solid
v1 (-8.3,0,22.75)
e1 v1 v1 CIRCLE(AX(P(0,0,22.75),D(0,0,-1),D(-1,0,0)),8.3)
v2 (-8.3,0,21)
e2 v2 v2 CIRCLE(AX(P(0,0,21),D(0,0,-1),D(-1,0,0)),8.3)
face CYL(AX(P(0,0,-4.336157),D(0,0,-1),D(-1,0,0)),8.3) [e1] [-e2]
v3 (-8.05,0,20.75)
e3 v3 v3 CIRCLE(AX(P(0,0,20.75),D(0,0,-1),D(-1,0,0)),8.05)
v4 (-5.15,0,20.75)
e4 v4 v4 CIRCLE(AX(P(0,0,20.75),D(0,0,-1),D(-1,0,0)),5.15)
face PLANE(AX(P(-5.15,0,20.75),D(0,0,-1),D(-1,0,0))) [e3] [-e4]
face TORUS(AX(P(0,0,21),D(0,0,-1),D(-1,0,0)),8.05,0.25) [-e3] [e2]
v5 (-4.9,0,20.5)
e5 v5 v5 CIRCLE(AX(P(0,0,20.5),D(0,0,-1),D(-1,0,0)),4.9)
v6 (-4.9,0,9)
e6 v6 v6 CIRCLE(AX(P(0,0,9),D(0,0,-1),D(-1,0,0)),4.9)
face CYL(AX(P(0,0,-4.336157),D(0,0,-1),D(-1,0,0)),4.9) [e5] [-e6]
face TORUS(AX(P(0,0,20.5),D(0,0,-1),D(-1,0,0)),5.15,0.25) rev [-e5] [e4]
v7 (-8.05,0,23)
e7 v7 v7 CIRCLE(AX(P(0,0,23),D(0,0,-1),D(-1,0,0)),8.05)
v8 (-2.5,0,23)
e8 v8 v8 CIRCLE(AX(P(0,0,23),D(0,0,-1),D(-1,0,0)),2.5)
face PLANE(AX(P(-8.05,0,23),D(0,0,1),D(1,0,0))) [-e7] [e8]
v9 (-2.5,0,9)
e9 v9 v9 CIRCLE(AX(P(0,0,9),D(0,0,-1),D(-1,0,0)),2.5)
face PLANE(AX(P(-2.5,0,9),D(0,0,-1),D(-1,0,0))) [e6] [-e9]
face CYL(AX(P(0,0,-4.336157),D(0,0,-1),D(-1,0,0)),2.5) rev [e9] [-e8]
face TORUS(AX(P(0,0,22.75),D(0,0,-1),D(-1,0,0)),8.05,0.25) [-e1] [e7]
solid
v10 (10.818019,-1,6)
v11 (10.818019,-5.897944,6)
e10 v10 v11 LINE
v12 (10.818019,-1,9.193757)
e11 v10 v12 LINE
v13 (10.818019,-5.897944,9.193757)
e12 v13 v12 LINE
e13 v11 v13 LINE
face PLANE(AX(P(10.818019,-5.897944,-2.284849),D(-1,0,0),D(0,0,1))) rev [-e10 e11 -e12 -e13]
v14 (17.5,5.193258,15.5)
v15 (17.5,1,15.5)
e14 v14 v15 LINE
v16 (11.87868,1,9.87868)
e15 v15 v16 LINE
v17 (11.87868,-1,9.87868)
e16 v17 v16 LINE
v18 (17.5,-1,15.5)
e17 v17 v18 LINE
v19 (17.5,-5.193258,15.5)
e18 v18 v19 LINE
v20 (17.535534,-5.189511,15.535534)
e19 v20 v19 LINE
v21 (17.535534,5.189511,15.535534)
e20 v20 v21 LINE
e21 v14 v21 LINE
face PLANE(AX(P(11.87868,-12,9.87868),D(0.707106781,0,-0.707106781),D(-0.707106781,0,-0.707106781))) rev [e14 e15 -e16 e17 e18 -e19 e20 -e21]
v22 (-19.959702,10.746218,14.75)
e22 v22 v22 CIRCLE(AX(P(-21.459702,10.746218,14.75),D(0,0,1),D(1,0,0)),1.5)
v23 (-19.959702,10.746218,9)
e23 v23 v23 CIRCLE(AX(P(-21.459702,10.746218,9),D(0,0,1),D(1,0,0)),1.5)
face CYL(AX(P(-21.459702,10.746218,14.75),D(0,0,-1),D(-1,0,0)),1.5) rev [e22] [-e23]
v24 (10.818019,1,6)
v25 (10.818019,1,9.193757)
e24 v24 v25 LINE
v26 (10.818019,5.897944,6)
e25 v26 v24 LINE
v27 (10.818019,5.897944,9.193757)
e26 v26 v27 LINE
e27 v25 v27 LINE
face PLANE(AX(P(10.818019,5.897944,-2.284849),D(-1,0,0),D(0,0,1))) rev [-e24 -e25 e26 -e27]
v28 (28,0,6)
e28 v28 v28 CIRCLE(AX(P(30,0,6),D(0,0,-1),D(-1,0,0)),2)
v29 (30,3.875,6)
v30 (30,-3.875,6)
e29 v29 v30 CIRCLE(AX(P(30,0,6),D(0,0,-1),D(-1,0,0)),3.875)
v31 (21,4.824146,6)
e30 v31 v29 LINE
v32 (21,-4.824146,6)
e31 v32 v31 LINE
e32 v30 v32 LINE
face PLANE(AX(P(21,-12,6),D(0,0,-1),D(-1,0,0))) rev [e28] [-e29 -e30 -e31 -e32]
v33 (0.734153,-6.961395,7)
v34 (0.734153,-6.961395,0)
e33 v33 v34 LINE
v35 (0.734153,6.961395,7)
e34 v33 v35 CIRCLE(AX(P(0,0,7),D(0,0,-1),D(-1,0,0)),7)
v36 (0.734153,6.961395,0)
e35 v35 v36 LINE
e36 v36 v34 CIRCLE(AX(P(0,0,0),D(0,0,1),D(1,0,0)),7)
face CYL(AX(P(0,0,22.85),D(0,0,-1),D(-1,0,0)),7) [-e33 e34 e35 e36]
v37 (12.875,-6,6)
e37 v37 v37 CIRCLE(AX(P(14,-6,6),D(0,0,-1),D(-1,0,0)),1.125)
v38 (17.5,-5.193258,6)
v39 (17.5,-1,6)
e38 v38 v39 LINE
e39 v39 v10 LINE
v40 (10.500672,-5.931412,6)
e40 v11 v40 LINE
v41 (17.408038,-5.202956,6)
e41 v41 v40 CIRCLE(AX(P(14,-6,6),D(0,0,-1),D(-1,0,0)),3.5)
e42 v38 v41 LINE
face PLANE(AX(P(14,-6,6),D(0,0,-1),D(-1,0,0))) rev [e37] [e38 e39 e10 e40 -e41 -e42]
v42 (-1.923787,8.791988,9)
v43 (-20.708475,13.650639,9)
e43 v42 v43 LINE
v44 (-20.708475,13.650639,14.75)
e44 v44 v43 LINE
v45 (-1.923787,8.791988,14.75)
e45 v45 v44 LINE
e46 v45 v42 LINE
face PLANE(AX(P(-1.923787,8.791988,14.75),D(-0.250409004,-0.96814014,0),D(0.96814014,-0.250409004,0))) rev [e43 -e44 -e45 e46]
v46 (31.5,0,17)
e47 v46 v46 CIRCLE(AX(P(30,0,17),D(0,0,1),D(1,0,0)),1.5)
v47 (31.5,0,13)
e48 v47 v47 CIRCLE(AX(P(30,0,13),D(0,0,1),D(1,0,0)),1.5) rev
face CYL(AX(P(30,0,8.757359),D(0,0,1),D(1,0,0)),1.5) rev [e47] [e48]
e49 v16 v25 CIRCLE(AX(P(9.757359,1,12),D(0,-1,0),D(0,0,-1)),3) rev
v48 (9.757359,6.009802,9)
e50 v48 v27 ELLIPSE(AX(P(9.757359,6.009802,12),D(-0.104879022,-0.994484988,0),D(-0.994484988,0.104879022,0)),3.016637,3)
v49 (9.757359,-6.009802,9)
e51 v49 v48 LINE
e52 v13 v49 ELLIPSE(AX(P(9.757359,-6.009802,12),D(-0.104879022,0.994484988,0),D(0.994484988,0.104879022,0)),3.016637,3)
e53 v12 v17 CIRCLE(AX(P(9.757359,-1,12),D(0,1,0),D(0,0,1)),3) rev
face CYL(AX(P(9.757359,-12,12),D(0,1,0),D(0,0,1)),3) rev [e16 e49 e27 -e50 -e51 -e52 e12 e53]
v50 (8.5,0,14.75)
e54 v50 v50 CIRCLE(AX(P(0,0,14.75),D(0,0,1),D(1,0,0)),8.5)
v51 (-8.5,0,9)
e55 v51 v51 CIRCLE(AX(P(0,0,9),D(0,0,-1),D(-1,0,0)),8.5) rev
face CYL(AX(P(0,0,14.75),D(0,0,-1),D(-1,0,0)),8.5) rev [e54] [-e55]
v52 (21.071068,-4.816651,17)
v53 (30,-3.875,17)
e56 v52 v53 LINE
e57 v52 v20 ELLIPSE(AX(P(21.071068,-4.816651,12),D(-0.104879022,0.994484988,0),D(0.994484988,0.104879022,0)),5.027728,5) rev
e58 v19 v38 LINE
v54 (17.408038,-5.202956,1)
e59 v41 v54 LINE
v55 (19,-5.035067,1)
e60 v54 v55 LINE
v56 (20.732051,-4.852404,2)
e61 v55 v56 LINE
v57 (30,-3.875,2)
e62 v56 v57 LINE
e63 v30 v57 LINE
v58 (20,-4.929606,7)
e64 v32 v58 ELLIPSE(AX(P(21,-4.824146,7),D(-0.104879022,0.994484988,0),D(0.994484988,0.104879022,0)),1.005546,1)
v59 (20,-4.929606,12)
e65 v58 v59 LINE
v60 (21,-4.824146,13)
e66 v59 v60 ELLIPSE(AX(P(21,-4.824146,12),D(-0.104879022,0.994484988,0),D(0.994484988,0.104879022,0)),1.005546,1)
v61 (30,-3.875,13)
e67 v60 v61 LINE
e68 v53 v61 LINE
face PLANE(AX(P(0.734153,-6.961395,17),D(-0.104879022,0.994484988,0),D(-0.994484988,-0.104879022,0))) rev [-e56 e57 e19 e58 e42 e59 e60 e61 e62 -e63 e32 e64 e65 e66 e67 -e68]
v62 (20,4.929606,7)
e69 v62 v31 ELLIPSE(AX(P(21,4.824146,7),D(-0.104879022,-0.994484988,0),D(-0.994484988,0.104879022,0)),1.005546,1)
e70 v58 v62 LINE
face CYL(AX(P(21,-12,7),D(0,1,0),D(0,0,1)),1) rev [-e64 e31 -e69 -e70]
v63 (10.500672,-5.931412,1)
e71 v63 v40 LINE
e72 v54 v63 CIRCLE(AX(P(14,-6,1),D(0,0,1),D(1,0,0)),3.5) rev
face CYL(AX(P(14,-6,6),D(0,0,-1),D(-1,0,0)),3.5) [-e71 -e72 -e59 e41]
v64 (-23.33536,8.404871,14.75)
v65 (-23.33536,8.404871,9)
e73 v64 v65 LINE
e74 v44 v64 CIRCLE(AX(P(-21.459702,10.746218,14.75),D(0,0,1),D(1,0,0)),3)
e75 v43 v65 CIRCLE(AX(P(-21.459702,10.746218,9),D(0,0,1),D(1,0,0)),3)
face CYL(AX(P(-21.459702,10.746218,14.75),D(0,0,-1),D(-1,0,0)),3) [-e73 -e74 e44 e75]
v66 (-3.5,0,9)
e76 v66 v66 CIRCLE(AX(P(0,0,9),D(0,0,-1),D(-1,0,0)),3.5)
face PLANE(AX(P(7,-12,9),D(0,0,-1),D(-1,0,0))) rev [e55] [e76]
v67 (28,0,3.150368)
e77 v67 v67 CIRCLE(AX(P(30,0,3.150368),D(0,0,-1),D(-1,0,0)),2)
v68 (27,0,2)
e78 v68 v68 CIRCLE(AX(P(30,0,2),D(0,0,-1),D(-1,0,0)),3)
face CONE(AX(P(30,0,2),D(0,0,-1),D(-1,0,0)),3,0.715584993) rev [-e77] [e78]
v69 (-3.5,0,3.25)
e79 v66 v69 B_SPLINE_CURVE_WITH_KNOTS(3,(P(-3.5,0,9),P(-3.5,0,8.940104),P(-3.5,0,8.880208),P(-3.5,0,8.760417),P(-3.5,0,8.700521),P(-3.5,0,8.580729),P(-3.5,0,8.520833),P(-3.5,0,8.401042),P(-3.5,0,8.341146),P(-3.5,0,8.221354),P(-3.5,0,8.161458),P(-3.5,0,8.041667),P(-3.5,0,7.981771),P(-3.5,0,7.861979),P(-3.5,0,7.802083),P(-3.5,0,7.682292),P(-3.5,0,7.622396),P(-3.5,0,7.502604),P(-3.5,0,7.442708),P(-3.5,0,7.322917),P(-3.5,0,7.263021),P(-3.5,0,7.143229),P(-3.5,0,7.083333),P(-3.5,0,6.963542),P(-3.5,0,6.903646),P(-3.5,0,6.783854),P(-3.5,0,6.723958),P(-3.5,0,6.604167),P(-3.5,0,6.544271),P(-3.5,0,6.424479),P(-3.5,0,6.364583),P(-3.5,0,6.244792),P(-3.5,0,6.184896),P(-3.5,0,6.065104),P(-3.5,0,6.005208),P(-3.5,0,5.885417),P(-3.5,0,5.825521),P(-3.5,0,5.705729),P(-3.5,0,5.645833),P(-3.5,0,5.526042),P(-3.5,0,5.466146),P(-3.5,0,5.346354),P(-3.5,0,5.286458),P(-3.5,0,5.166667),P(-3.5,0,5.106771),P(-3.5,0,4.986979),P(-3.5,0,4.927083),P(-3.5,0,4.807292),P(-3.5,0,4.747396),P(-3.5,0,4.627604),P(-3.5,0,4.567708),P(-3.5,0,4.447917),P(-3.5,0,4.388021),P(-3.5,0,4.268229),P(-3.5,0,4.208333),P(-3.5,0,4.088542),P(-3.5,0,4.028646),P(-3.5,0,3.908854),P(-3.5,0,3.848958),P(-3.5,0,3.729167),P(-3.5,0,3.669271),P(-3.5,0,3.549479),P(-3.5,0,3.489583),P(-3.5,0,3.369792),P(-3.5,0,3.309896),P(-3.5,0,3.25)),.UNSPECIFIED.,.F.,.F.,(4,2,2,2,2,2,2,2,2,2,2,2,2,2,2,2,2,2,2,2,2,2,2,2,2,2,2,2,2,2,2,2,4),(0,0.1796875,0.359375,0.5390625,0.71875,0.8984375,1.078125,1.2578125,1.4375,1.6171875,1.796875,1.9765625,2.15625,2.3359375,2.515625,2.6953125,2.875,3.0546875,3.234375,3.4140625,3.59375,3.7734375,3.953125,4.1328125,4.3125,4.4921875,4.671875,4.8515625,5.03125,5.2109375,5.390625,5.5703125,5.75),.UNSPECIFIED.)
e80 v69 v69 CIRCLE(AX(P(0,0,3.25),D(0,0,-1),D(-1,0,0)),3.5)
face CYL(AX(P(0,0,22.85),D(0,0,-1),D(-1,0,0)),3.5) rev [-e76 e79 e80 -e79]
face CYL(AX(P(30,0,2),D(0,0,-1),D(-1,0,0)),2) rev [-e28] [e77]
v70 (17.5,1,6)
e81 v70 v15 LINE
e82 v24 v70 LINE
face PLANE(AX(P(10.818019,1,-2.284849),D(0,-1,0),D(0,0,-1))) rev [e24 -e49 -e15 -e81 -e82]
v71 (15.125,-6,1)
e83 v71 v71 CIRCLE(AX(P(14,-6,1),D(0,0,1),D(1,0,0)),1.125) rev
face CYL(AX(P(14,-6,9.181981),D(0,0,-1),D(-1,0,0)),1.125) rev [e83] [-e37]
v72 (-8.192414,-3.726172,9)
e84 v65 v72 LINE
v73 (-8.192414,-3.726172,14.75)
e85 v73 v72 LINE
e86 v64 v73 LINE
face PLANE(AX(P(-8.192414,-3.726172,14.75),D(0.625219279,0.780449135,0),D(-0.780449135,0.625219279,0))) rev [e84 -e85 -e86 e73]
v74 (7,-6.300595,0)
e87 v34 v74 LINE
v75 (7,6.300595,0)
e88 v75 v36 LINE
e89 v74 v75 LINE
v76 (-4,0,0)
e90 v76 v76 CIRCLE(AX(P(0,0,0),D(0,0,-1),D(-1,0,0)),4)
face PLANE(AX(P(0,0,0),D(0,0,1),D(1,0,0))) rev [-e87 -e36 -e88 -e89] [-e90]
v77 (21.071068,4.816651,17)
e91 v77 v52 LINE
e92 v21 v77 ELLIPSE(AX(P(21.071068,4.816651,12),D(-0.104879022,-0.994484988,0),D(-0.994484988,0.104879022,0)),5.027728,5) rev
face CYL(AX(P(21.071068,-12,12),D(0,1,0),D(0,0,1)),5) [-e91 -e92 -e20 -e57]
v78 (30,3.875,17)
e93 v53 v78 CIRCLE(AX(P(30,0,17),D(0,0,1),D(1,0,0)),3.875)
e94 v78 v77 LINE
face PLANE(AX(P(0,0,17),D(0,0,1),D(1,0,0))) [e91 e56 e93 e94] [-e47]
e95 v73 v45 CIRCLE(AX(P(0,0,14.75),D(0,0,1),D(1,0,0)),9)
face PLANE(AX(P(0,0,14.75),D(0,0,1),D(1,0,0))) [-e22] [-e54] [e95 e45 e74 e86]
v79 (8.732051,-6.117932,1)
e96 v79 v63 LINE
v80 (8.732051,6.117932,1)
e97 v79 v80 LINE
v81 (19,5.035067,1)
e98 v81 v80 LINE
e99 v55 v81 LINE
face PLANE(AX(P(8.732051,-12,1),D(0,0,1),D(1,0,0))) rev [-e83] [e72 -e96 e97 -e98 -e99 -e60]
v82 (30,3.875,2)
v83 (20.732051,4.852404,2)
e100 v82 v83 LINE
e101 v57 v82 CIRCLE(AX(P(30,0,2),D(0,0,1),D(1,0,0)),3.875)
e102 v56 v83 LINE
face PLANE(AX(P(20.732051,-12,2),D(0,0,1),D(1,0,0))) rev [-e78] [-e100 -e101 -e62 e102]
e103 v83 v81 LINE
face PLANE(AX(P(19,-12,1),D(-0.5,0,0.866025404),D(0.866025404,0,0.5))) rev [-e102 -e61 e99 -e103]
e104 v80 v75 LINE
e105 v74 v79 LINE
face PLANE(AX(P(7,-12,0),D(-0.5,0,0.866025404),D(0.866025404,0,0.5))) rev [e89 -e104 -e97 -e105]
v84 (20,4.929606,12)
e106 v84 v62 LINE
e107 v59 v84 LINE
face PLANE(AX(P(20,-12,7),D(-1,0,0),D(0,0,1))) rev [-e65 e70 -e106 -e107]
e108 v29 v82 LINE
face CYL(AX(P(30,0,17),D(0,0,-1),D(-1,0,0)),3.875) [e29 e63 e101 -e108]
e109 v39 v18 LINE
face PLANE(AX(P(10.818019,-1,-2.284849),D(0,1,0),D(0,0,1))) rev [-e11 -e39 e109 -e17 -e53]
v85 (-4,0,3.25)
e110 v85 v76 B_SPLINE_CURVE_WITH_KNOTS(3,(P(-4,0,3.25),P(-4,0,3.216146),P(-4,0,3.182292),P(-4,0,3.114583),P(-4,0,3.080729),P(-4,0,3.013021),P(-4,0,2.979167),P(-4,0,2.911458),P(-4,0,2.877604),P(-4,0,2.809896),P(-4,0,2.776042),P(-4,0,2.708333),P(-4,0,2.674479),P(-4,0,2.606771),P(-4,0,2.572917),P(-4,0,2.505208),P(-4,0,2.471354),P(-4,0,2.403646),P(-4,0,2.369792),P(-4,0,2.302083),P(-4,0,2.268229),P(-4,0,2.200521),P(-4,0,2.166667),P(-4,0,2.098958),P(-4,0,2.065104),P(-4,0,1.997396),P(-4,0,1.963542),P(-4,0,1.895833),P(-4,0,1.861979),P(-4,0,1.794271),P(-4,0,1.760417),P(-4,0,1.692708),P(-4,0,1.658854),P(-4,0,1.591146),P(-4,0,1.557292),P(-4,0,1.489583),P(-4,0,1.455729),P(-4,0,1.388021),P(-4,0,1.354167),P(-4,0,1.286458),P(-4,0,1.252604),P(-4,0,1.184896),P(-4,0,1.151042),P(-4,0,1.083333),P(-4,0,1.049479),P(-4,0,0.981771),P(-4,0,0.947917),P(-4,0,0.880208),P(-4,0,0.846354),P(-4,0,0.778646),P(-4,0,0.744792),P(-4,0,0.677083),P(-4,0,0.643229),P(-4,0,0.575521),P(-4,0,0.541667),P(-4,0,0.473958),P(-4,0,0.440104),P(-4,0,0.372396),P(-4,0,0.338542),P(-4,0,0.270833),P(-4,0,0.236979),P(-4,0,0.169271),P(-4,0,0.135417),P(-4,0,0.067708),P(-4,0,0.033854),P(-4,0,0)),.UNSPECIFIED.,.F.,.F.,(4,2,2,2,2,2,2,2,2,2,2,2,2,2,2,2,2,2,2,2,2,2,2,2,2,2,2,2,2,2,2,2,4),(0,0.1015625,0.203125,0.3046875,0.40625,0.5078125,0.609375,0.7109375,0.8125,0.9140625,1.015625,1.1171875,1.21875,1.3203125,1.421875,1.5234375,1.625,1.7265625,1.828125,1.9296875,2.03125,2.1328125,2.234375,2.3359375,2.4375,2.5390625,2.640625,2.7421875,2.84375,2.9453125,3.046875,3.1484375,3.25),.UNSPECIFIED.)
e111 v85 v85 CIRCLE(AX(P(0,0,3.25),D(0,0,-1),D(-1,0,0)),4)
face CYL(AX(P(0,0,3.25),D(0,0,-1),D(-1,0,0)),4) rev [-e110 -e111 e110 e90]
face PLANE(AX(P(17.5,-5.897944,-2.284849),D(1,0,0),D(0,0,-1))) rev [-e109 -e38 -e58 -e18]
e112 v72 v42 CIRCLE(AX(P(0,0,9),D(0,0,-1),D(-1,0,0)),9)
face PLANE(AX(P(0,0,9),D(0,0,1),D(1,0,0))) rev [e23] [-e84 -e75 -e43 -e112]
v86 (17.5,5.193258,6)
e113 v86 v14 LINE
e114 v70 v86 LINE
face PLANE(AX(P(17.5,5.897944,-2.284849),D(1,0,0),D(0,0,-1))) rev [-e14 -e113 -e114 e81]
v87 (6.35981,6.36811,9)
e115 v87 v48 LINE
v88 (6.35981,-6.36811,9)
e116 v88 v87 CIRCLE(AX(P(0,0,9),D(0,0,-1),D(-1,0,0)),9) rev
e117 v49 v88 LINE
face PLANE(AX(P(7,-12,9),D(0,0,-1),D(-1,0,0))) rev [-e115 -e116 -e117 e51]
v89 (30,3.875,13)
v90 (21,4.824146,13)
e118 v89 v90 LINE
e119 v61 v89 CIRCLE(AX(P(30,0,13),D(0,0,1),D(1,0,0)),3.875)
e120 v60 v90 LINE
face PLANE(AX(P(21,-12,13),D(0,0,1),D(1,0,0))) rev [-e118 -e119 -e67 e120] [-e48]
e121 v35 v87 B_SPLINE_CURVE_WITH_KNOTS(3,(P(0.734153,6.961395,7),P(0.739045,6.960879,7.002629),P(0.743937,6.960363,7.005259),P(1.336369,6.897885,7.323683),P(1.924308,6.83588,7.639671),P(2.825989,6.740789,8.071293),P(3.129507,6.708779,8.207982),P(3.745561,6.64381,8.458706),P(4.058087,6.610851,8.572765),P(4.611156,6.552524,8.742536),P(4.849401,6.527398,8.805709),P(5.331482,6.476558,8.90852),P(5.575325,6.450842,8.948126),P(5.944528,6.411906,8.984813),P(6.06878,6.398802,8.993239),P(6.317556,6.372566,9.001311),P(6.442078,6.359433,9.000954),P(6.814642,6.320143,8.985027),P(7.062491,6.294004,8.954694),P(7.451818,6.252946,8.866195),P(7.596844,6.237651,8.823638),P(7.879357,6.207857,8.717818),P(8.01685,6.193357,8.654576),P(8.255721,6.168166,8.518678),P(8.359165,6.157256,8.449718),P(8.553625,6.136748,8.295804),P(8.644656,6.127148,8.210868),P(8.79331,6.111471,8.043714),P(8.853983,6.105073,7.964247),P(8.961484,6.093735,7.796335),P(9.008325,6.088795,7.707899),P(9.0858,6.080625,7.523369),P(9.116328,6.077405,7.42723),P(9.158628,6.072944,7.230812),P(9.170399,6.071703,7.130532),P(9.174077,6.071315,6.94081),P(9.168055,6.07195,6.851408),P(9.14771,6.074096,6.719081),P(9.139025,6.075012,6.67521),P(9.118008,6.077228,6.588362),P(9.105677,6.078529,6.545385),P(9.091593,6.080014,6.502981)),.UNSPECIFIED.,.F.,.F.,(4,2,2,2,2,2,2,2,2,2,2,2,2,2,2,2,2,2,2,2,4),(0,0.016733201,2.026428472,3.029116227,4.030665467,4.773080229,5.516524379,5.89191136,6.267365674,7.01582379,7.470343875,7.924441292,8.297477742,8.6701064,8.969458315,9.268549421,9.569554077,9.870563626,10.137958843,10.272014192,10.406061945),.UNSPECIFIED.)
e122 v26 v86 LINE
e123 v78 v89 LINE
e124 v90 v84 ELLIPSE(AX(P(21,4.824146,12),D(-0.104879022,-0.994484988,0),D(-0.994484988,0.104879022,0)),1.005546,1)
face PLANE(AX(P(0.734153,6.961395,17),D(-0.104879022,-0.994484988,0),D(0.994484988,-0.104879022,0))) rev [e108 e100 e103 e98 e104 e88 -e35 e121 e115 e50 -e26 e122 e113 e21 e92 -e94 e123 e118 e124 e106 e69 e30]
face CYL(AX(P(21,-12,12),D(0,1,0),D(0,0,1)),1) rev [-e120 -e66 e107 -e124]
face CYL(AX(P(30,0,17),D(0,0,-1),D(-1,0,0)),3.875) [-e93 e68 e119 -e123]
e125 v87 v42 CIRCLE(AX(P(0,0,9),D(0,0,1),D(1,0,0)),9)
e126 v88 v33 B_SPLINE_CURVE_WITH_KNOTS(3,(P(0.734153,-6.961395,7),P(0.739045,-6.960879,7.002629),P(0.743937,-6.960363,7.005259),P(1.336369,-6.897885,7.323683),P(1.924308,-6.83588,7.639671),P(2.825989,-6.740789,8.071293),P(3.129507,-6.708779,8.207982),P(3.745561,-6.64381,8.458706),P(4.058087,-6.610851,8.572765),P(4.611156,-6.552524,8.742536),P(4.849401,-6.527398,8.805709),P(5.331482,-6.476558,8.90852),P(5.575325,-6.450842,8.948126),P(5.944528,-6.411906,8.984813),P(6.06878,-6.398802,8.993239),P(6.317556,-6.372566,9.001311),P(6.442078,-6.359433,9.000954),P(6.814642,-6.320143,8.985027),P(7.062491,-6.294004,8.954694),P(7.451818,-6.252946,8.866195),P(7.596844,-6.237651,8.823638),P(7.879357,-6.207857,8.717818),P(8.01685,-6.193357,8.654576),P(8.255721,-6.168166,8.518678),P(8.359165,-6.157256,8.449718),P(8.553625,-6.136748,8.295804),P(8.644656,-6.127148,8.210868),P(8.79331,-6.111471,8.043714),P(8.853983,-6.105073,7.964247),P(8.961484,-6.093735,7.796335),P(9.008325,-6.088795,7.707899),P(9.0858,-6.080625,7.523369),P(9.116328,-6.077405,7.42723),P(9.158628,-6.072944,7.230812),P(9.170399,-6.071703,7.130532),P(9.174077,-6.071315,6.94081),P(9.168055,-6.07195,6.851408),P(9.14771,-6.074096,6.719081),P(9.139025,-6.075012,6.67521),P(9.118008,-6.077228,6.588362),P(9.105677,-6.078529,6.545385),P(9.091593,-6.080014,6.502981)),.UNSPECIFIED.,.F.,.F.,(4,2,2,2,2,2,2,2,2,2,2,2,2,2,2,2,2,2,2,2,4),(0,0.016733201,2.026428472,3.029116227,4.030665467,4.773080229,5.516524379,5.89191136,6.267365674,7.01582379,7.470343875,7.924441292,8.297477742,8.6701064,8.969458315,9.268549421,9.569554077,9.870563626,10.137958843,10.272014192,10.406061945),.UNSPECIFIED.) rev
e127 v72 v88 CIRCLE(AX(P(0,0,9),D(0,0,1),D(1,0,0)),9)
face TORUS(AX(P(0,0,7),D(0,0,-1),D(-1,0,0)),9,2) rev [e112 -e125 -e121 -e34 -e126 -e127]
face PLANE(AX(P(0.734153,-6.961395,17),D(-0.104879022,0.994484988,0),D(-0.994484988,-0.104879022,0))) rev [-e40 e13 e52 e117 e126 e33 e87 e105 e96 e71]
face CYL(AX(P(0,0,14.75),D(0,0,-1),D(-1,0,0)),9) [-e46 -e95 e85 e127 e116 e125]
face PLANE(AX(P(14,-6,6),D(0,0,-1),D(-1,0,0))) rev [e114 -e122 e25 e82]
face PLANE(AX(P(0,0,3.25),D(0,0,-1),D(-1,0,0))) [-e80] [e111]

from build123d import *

# Parameters (mm, degrees)
SKETCH1_R                = 7
SKETCH1_R_2              = 3.5
CYLINDER_DEPTH           = 22.85
SKETCH2_R                = 4
BORE_1_DEPTH             = 3.25
BORE_START               = -3.25
SKETCH3_R                = 4
BORE_2_DEPTH             = 3.25
ARM_DEPTH                = 17
SKETCH5_R                = 3.5
OUTER_HOLE_SURFACE_DEPTH = 6
SKETCH6_R                = 1.125
OUTER_HOLE_DEPTH         = 6
SIDE_FEATURES_DEPTH      = 22
RIB_START                = -11
SKETCH10_W               = 6.681980515
SKETCH10_H               = 4.897943925
RIB_DEPTH                = 9.5
SKETCH13_R               = 1.5
BOTTOM_HOLE_DEPTH        = 4
MODIFY_START             = -17
SKETCH14_W               = 14
SKETCH14_H               = 13.85
MODIFY_1ST_POST_DEPTH    = 14
SKETCH16_R               = 8.5
SKETCH16_R_2             = 1.5
ARM_2_DEPTH              = 5.75


# Read off the part's stored shape, not the designer's step: Top Counter-sunk
with BuildPart() as part:
    # Sketch1 → Cylinder (new body)
    with BuildSketch(Plane.XY):
        with Locations(Location((0, 0, 0), (0, 0, 180))):
            Circle(SKETCH1_R)
        with Locations(Location((0, 0, 0), (0, 0, 180))):
            Circle(SKETCH1_R_2, mode=Mode.SUBTRACT)
    extrude(amount=CYLINDER_DEPTH)

    # Sketch2 → Bore 1 (cut)
    with BuildSketch(Plane.XY.offset(22.85)):
        Circle(SKETCH2_R)
    extrude(amount=-BORE_1_DEPTH, mode=Mode.SUBTRACT)

    # Sketch3 → Bore 2 (cut)
    with BuildSketch(Plane(origin=(0, 0, 0), x_dir=(-1, 0, 0), z_dir=(0, 0, -1)).offset(BORE_START)):
        with Locations(Location((0, 0, 0), (0, 0, 180))):
            Circle(SKETCH3_R)
    extrude(amount=BORE_2_DEPTH, mode=Mode.SUBTRACT)

    # Sketch4 → Arm (add)
    with BuildSketch(Plane.XY):
        with BuildLine():
            Line((0.734153157, 6.961394914), (30, 3.875))
            ThreePointArc((30, 3.875), (33.875, 0), (30, -3.875))
            Line((30, -3.875), (0.734153157, -6.961394914))
            ThreePointArc((0.734153157, -6.961394914), (7, 0), (0.734153157, 6.961394914))
        make_face()
    extrude(amount=ARM_DEPTH)

    # Sketch5 → Outer Hole surface (add)
    with BuildSketch(Plane(origin=(0, 0, 0), x_dir=(-1, 0, 0), z_dir=(0, 0, -1))):
        with Locations((-14, -6)):
            Circle(SKETCH5_R)
    extrude(amount=-OUTER_HOLE_SURFACE_DEPTH)

    # Sketch6 → Outer hole (cut)
    with BuildSketch(Plane(origin=(0, 0, 0), x_dir=(-1, 0, 0), z_dir=(0, 0, -1))):
        with Locations((-14, -6)):
            Circle(SKETCH6_R)
    extrude(amount=-OUTER_HOLE_DEPTH, mode=Mode.SUBTRACT)

    # Sketch8 → side Features (cut)
    with BuildSketch(Plane(origin=(0, 10, 0), x_dir=(1, 0, 0), z_dir=(0, 1, 0))):
        with BuildLine():
            Line((21, -6), (40, -6))
            Line((40, -6), (40, -13))
            Line((40, -13), (21, -13))
            ThreePointArc((21, -13), (20.292893219, -12.707106781), (20, -12))
            Line((20, -12), (20, -7))
            ThreePointArc((20, -7), (20.292893219, -6.292893219), (21, -6))
        make_face()
        with BuildLine():
            Line((7, -19), (7, -9))
            Line((7, -9), (9.757359313, -9))
            ThreePointArc((9.757359313, -9), (10.90540961, -9.228361402), (11.878679656, -9.878679656))
            Line((11.878679656, -9.878679656), (17.535533906, -15.535533906))
            ThreePointArc((17.535533906, -15.535533906), (19.15765065, -16.619397663), (21.071067812, -17))
            Line((21.071067812, -17), (27, -17))
            Line((27, -17), (27, -19))
            Line((27, -19), (7, -19))
        make_face()
        Polygon((7, 0), (8.732050808, -1), (19, -1), (20.732050808, -2), (40, -2), (40, 0), align=None)
    extrude(amount=-SIDE_FEATURES_DEPTH, mode=Mode.SUBTRACT)

    # Sketch10 → Rib (cut)
    with BuildSketch(Plane.XY.offset(17).offset(RIB_START)):
        with Locations((14.159009743, 3.448971963)):
            Rectangle(SKETCH10_W, SKETCH10_H)
        with Locations((14.159009743, -3.448971963)):
            Rectangle(SKETCH10_W, SKETCH10_H)
    extrude(amount=RIB_DEPTH, mode=Mode.SUBTRACT)

    # Top Counter-sunk outline → Top Counter-sunk (revolve, cut)
    with BuildSketch(Plane(origin=(30, 0, 0), x_dir=(1, 0, 0), z_dir=(0, -1, 0))):
        Polygon((2, 3.150368407), (2, 6), (0, 6), (0, 2), (3, 2), align=None)
    revolve(axis=Axis((30, 0, 0), (0, 0, 1)), mode=Mode.SUBTRACT)

    # Sketch13 → Bottom hole (cut)
    with BuildSketch(Plane.XY.offset(17)):
        with Locations((30, 0)):
            Circle(SKETCH13_R)
    extrude(amount=-BOTTOM_HOLE_DEPTH, mode=Mode.SUBTRACT)

    # Sketch14 → Modify 1st Post (cut)
    with BuildSketch(Plane(origin=(0, 10, 0), x_dir=(1, 0, 0), z_dir=(0, 1, 0)).offset(MODIFY_START)):
        with Locations((0, -15.925)):
            Rectangle(SKETCH14_W, SKETCH14_H)
    extrude(amount=MODIFY_1ST_POST_DEPTH, mode=Mode.SUBTRACT)

    # Sketch16 → Arm 2 (add)
    with BuildSketch(Plane.XY.offset(9)):
        with BuildLine():
            Line((-1.923786579, 8.791987557), (-20.708474673, 13.650638528))
            ThreePointArc((-20.708474673, 13.650638528), (-24.142164395, 12.089495372), (-23.335359521, 8.404870702))
            Line((-23.335359521, 8.404870702), (-8.192413809, -3.726171759))
            ThreePointArc((-8.192413809, -3.726171759), (8.047388132, -4.029831791), (-1.923786579, 8.791987557))
        make_face()
        with Locations(Location((0, 0, 0), (0, 0, 49.419481648))):
            Circle(SKETCH16_R, mode=Mode.SUBTRACT)
        with Locations((-21.459701684, 10.746218108)):
            Circle(SKETCH16_R_2, mode=Mode.SUBTRACT)
    extrude(amount=ARM_2_DEPTH)

    # Sketch18 → Connect Arm 2 (revolve)
    with BuildSketch(Plane(origin=(0, 0, 0), x_dir=(1, 0, 0), z_dir=(0, 1, 0))):
        with BuildLine():
            Line((-7, -7), (-7, -9))
            Line((-7, -9), (-9, -9))
            ThreePointArc((-9, -9), (-7.585786438, -8.414213562), (-7, -7))
        make_face()
    revolve(axis=Axis((0, 0, -2.563667384), (0, 0, 1)))


with BuildPart() as body_2:
    # Sketch19 → Base (revolve)
    with BuildSketch(Plane(origin=(0, 0, 0), x_dir=(1, 0, 0), z_dir=(0, 1, 0))):
        with BuildLine():
            Line((-4.9, -9), (-4.9, -20.5))
            ThreePointArc((-4.9, -20.5), (-4.973223305, -20.676776695), (-5.15, -20.75))
            Line((-5.15, -20.75), (-8.05, -20.75))
            ThreePointArc((-8.05, -20.75), (-8.226776695, -20.823223305), (-8.3, -21))
            Line((-8.3, -21), (-8.3, -22.75))
            ThreePointArc((-8.3, -22.75), (-8.226776695, -22.926776695), (-8.05, -23))
            Line((-8.05, -23), (-2.5, -23))
            Line((-2.5, -23), (-2.5, -9))
            Line((-2.5, -9), (-4.9, -9))
        make_face()
    revolve(axis=Axis((0, 0, -4.336156577), (0, 0, 1)))


solid = Compound([part.part, body_2.part])
